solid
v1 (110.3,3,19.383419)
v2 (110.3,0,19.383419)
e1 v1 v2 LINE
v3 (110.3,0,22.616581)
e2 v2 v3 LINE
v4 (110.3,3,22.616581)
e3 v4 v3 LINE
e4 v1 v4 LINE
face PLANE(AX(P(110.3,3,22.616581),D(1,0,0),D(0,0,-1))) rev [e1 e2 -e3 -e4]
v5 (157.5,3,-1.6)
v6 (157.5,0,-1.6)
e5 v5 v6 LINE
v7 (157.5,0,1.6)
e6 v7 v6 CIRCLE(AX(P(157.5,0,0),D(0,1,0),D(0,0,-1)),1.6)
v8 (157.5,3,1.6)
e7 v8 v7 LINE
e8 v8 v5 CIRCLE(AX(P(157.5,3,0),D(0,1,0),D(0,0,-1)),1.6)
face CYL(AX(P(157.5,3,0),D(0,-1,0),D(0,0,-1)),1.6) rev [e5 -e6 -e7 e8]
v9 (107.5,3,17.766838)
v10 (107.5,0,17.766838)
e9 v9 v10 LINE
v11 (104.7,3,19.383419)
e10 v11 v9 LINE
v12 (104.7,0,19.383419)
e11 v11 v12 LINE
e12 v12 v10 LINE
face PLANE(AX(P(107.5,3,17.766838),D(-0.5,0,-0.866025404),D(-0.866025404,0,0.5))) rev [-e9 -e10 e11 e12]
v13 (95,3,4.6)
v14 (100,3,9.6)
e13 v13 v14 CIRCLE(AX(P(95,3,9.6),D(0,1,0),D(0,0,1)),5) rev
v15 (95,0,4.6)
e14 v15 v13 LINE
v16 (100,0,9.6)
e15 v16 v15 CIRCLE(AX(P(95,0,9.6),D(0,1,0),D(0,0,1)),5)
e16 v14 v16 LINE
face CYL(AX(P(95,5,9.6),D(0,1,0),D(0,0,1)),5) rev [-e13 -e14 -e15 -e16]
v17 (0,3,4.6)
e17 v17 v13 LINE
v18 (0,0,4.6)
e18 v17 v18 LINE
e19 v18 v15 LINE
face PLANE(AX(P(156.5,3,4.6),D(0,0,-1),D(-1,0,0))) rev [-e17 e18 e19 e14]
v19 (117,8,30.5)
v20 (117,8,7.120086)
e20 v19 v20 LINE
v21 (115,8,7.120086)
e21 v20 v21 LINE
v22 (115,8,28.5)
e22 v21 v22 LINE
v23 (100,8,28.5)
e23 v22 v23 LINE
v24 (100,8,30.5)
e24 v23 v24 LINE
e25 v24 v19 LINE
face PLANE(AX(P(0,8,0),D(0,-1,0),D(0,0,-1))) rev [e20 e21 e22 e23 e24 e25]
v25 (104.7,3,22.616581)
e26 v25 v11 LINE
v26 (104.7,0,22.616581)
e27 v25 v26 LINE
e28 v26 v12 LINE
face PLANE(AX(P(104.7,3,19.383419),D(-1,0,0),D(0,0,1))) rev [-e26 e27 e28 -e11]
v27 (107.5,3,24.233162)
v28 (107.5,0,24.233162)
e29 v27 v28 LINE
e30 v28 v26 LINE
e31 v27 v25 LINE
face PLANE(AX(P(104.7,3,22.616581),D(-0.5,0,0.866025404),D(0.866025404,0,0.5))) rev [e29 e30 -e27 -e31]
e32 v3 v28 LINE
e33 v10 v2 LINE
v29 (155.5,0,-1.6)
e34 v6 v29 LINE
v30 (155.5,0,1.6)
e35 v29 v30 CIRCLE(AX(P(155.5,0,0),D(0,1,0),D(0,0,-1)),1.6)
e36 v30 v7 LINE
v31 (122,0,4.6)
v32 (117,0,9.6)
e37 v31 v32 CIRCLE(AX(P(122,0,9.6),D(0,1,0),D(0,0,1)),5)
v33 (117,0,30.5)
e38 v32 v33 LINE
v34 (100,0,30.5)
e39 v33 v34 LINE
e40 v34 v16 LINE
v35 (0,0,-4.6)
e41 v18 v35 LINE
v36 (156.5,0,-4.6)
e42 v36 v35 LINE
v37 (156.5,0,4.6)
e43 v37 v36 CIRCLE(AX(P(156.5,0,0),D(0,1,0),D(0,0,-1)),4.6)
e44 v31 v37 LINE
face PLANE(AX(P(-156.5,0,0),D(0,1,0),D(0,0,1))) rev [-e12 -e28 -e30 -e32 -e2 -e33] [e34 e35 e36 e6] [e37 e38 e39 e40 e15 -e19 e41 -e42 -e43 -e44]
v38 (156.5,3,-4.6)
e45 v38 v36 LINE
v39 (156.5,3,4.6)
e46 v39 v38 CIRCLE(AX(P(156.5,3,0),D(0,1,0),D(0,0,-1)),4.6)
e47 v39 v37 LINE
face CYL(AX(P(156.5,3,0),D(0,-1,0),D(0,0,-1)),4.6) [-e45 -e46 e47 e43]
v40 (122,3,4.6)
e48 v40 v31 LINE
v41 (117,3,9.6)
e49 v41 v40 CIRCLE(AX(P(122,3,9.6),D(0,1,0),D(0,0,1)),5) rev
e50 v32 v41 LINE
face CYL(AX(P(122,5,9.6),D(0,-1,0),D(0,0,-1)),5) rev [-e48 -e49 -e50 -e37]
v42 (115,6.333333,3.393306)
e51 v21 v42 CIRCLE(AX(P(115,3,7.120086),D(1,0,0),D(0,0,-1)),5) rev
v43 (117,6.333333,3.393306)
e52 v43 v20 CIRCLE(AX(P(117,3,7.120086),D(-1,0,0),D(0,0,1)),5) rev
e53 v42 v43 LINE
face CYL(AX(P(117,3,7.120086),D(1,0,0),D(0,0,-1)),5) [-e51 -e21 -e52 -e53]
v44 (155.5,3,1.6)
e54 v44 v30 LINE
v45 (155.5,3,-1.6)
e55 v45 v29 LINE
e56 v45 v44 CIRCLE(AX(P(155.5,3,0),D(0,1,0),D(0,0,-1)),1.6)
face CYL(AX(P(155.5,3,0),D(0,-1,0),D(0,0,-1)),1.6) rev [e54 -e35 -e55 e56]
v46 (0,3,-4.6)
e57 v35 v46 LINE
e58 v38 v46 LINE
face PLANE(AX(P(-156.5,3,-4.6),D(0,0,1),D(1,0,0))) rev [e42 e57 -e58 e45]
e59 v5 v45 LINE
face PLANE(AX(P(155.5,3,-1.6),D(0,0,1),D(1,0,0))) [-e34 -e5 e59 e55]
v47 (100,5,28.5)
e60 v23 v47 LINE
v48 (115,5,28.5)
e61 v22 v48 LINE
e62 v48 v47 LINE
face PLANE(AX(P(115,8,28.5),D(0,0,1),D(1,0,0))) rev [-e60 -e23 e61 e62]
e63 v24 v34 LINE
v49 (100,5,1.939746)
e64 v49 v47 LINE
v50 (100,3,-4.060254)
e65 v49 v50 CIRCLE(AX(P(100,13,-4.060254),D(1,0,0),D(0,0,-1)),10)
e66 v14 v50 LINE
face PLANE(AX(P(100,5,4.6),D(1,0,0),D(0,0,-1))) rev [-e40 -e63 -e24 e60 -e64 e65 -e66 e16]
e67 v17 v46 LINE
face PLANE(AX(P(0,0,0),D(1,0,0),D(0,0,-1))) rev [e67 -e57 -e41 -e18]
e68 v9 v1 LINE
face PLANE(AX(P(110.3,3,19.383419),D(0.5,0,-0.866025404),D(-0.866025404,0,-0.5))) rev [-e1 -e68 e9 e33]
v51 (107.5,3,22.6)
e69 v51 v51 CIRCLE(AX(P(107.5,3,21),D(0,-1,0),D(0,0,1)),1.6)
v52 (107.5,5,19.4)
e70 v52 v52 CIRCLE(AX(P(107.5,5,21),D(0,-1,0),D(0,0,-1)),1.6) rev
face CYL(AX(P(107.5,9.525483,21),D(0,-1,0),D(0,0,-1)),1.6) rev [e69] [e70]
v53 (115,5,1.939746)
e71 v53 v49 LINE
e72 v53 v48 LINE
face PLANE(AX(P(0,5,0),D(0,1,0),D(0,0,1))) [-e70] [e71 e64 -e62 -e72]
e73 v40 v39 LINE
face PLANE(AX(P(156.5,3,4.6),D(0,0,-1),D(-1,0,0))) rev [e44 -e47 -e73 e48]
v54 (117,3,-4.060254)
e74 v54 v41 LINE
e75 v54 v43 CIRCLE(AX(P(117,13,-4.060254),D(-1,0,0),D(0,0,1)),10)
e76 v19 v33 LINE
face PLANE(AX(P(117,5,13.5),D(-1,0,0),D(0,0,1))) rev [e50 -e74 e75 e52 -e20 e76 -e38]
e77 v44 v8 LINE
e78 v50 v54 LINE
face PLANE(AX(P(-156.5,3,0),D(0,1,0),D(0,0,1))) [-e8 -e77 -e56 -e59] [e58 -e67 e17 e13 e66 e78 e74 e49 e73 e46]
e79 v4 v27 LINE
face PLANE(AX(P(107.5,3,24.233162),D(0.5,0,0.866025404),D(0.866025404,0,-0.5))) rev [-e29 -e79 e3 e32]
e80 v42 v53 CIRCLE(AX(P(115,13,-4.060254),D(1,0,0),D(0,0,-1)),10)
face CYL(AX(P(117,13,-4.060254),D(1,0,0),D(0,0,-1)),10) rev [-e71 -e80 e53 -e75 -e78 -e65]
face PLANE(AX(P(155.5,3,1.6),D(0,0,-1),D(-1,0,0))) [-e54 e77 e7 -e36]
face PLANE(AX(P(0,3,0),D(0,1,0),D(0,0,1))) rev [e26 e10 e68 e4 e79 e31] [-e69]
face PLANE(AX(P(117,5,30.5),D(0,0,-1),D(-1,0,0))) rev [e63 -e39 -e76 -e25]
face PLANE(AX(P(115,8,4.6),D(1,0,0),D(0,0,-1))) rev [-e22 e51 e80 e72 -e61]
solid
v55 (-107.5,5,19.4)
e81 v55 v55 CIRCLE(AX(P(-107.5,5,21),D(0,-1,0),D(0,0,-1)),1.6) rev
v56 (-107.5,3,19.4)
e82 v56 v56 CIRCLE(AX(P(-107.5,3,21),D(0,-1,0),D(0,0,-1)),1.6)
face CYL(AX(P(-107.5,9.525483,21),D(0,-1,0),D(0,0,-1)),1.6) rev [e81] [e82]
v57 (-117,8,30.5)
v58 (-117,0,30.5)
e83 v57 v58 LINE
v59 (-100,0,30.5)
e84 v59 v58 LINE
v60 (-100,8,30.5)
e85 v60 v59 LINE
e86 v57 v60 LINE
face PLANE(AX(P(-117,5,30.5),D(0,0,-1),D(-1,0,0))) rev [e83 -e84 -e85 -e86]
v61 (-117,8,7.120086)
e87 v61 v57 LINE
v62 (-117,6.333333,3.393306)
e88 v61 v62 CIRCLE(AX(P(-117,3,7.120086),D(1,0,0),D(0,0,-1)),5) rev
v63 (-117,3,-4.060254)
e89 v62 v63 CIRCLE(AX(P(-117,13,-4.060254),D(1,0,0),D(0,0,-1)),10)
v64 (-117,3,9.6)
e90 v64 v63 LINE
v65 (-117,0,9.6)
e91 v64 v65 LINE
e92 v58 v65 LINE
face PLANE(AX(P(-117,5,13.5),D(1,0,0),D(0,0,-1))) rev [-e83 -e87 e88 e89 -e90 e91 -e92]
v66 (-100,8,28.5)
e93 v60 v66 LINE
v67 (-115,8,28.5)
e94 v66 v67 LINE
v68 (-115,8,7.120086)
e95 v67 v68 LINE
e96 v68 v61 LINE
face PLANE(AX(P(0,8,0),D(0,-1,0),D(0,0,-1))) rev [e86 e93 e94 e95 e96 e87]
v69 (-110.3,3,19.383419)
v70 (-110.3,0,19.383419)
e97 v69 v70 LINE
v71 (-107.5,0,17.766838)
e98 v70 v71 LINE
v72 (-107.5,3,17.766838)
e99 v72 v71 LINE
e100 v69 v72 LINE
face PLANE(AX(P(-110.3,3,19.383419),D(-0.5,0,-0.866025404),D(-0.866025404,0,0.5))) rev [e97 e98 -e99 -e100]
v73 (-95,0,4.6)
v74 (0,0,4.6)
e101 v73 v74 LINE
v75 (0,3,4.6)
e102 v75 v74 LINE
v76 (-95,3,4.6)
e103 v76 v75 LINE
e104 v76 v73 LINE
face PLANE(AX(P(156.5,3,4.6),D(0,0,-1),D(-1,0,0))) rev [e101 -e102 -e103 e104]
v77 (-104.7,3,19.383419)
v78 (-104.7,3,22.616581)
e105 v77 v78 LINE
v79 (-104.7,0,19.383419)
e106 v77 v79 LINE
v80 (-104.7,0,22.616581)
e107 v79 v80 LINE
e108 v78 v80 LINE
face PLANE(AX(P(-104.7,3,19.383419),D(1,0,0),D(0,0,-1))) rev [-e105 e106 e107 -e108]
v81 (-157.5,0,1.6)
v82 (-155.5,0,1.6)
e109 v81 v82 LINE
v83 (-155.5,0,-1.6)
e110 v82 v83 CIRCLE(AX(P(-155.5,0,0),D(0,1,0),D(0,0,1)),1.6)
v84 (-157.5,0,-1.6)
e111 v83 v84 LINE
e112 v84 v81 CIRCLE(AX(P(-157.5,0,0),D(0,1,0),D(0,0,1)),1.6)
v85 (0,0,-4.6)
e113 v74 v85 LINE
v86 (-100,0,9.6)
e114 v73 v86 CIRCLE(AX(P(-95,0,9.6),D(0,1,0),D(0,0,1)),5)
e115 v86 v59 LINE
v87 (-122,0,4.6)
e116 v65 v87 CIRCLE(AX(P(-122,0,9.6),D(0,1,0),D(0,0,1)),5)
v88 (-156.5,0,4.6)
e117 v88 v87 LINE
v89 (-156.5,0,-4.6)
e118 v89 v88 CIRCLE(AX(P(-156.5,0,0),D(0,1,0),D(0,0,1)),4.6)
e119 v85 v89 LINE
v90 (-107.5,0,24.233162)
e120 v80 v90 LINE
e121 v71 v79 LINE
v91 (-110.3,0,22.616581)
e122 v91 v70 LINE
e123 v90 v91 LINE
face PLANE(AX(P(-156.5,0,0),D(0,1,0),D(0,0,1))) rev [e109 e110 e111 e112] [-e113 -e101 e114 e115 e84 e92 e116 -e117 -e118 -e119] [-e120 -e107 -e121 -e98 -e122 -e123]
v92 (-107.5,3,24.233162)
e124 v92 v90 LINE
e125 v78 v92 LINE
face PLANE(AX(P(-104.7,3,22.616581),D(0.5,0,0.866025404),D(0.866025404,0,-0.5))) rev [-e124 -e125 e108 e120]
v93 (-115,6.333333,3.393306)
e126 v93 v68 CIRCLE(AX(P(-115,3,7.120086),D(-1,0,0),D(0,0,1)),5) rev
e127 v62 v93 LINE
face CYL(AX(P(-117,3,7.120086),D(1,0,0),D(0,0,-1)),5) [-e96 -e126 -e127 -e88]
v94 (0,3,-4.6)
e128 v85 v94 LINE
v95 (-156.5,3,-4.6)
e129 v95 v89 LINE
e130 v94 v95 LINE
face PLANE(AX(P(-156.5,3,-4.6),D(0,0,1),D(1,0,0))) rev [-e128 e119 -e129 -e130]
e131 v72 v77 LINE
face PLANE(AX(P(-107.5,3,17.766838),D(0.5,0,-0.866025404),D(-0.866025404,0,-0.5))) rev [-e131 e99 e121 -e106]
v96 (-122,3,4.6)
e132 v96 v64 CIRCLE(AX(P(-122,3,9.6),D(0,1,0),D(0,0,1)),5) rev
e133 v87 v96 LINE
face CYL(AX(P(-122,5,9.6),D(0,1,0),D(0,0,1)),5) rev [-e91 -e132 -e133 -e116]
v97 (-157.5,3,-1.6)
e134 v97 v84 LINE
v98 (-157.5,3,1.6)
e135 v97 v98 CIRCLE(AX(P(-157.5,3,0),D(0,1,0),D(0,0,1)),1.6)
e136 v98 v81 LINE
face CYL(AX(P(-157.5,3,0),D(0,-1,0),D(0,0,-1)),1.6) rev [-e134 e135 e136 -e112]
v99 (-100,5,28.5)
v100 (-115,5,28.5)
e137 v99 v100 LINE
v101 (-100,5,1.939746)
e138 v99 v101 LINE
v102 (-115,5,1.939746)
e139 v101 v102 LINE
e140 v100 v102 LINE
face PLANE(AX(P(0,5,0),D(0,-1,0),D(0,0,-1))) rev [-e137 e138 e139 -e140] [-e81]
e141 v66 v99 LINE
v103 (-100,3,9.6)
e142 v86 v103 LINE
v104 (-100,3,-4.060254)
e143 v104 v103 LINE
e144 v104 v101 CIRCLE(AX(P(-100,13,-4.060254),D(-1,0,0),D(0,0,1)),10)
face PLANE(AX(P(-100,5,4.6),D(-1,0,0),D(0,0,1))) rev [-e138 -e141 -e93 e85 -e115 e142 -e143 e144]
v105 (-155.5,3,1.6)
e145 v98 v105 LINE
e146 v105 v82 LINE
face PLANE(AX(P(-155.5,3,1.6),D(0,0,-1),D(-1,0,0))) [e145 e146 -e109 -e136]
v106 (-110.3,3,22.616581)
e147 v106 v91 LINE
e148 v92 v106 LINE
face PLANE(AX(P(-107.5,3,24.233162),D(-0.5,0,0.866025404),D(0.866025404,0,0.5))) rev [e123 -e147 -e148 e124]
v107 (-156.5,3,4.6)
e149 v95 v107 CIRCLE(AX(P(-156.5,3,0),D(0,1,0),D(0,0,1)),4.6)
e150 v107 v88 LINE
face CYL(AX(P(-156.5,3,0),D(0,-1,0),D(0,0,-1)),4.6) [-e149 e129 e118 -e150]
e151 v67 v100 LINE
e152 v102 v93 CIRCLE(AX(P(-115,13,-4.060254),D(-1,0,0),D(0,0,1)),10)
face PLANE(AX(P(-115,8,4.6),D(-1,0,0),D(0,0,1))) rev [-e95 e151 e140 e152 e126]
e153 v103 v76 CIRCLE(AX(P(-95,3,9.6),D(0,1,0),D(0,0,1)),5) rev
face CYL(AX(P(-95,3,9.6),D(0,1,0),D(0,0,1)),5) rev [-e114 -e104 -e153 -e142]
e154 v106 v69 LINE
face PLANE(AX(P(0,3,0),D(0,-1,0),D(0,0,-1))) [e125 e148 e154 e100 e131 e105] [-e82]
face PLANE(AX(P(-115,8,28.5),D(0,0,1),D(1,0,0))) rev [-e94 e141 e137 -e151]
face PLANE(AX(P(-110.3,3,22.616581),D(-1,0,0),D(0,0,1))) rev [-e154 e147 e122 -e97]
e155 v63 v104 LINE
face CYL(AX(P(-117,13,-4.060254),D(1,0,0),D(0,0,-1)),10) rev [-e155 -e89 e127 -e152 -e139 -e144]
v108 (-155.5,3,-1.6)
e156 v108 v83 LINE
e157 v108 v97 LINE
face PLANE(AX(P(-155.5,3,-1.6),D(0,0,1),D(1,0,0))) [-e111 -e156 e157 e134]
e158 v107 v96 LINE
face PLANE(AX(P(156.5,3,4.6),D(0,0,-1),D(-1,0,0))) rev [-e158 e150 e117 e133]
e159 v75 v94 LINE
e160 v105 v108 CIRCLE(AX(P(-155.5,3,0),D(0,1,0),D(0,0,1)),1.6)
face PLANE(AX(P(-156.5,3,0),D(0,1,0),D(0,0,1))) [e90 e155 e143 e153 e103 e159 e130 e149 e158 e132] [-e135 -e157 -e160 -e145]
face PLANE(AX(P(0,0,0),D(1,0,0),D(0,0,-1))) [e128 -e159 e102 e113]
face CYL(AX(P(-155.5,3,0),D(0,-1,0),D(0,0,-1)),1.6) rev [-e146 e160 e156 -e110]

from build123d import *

# Parameters (mm, degrees)
EXTRUDE_1_DEPTH     = 3
EXTRUDE_START       = -3
EXTRUDE_3_DEPTH     = 5
EXTRUDE_5_DEPTH     = 3
CUT_EXTRUDE_1_DEPTH = 3
SKETCH_7_R          = 1.6
CUT_EXTRUDE_2_DEPTH = 2
FILLET_START        = -117
FILLET_1_DEPTH      = 17
FILLET_START_2      = 100
FILLET_1_2_DEPTH    = 17
FILLET_1_3_DEPTH    = 2
FILLET_START_3      = 115
FILLET_1_4_DEPTH    = 2
FILLET_2_R          = 5
FILLET_3_R          = 5


with BuildPart() as part:
    # Эскиз1 → Бобышка-Вытянуть1 (new body)
    with BuildSketch(Plane(origin=(0, 0, 0), x_dir=(1, 0, 0), z_dir=(0, 1, 0))):
        with BuildLine():
            Line((-156.5, 4.6), (156.5, 4.6))
            ThreePointArc((156.5, 4.6), (161.1, 0), (156.5, -4.6))
            Line((156.5, -4.6), (-156.5, -4.6))
            ThreePointArc((-156.5, -4.6), (-161.1, 0), (-156.5, 4.6))
        make_face()
        with BuildLine():
            Line((-155.5, -1.6), (-157.5, -1.6))
            ThreePointArc((-157.5, -1.6), (-159.1, 0), (-157.5, 1.6))
            Line((-157.5, 1.6), (-155.5, 1.6))
            ThreePointArc((-155.5, 1.6), (-153.9, 0), (-155.5, -1.6))
        make_face(mode=Mode.SUBTRACT)
        with BuildLine():
            Line((155.5, -1.6), (157.5, -1.6))
            ThreePointArc((157.5, -1.6), (159.1, 0), (157.5, 1.6))
            Line((157.5, 1.6), (155.5, 1.6))
            ThreePointArc((155.5, 1.6), (153.9, 0), (155.5, -1.6))
        make_face(mode=Mode.SUBTRACT)
    extrude(amount=EXTRUDE_1_DEPTH)

    # Эскиз3 → Бобышка-Вытянуть3 (add)
    with BuildSketch(Plane(origin=(0, 3, 0), x_dir=(1, 0, 0), z_dir=(0, 1, 0)).offset(EXTRUDE_START)):
        Polygon((-117, -13.5), (-117, -30.5), (-100, -30.5), (-100, -4.6), (-117, -4.6), align=None)
        Polygon((117, -4.6), (100, -4.6), (100, -30.5), (117, -30.5), (117, -13.5), align=None)
    extrude(amount=EXTRUDE_3_DEPTH)

    # Эскиз5 → Бобышка-Вытянуть5 (add)
    with BuildSketch(Plane(origin=(0, 5, 0), x_dir=(1, 0, 0), z_dir=(0, 1, 0))):
        Polygon((-117, -4.6), (-117, -30.5), (-100, -30.5), (-100, -28.5), (-115, -28.5), (-115, -4.6), align=None)
        Polygon((117, -4.6), (115, -4.6), (115, -28.5), (100, -28.5), (100, -30.5), (117, -30.5), align=None)
    extrude(amount=EXTRUDE_5_DEPTH)

    # Эскиз6 → Вырез-Вытянуть1 (cut)
    with BuildSketch(Plane.XZ):
        Polygon((107.5, 17.766838493), (104.7, 19.383419246), (104.7, 22.616580754), (107.5, 24.233161507), (110.3, 22.616580754), (110.3, 19.383419246), align=None)
        Polygon((-107.5, 24.233161507), (-110.3, 22.616580754), (-110.3, 19.383419246), (-107.5, 17.766838493), (-104.7, 19.383419246), (-104.7, 22.616580754), align=None)
    extrude(amount=-CUT_EXTRUDE_1_DEPTH, mode=Mode.SUBTRACT)

    # Эскиз7 → Вырез-Вытянуть2 (cut)
    with BuildSketch(Plane.XZ.offset(-3)):
        with Locations(Location((-107.5, 21, 0), (0, 0, 270))):
            Circle(SKETCH_7_R)
        with Locations(Location((107.5, 21, 0), (0, 0, 270))):
            Circle(SKETCH_7_R)
    extrude(amount=-CUT_EXTRUDE_2_DEPTH, mode=Mode.SUBTRACT)

    # Скругление1: read off the stored shape, not the designer's step
    # Скругление1 outline → Скругление1 (add)
    with BuildSketch(Plane.YZ.offset(FILLET_START)):
        with BuildLine():
            Line((5, 1.939745962), (5, 4.6))
            Line((5, 4.6), (3, 4.6))
            Line((3, 4.6), (3, -4.060254038))
            ThreePointArc((3, -4.060254038), (3.513167019, -0.897976378), (5, 1.939745962))
        make_face()
    extrude(amount=FILLET_1_DEPTH)

    # Fillet 1 2 outline → Fillet 1 2 (add)
    with BuildSketch(Plane.YZ.offset(FILLET_START_2)):
        with BuildLine():
            Line((5, 1.939745962), (5, 4.6))
            Line((5, 4.6), (3, 4.6))
            Line((3, 4.6), (3, -4.060254038))
            ThreePointArc((3, -4.060254038), (3.513167019, -0.897976378), (5, 1.939745962))
        make_face()
    extrude(amount=FILLET_1_2_DEPTH)

    # Fillet 1 3 outline → Fillet 1 3 (add)
    with BuildSketch(Plane.YZ.offset(FILLET_START)):
        with BuildLine():
            Line((8, 4.6), (5, 4.6))
            Line((5, 4.6), (5, 1.939745962))
            ThreePointArc((5, 1.939745962), (6.365300467, 3.42177524), (8, 4.6))
        make_face()
    extrude(amount=FILLET_1_3_DEPTH)

    # Fillet 1 4 outline → Fillet 1 4 (add)
    with BuildSketch(Plane.YZ.offset(FILLET_START_3)):
        with BuildLine():
            Line((8, 4.6), (5, 4.6))
            Line((5, 4.6), (5, 1.939745962))
            ThreePointArc((5, 1.939745962), (6.365300467, 3.42177524), (8, 4.6))
        make_face()
    extrude(amount=FILLET_1_4_DEPTH)

    # Скругление2
    fillet_2_edges = [part.edges().sort_by_distance(p)[0] for p in [
        (117, 1.5, 4.6),
        (100, 1.5, 4.6),
        (-100, 1.5, 4.6),
        (-117, 1.5, 4.6),
    ]]
    fillet(fillet_2_edges, radius=FILLET_2_R)

    # Скругление3
    fillet_3_edges = [part.edges().sort_by_distance(p)[0] for p in [
        (-116, 8, 4.6),
        (116, 8, 4.6),
    ]]
    fillet(fillet_3_edges, radius=FILLET_3_R)


with BuildPart() as body_2:
    # Split Bodies 1: the piece on the far side of the plane
    add(part.part)
    split(bisect_by=Plane(origin=(0, 0, 0), x_dir=(0, 0, 1), z_dir=(1, 0, 0)), keep=Keep.BOTTOM)


with BuildPart() as part_1:
    add(part.part)

    # Split Bodies 1
    split(bisect_by=Plane(origin=(0, 0, 0), x_dir=(0, 0, 1), z_dir=(1, 0, 0)), keep=Keep.TOP)


solid = Compound([body_2.part, part_1.part])
